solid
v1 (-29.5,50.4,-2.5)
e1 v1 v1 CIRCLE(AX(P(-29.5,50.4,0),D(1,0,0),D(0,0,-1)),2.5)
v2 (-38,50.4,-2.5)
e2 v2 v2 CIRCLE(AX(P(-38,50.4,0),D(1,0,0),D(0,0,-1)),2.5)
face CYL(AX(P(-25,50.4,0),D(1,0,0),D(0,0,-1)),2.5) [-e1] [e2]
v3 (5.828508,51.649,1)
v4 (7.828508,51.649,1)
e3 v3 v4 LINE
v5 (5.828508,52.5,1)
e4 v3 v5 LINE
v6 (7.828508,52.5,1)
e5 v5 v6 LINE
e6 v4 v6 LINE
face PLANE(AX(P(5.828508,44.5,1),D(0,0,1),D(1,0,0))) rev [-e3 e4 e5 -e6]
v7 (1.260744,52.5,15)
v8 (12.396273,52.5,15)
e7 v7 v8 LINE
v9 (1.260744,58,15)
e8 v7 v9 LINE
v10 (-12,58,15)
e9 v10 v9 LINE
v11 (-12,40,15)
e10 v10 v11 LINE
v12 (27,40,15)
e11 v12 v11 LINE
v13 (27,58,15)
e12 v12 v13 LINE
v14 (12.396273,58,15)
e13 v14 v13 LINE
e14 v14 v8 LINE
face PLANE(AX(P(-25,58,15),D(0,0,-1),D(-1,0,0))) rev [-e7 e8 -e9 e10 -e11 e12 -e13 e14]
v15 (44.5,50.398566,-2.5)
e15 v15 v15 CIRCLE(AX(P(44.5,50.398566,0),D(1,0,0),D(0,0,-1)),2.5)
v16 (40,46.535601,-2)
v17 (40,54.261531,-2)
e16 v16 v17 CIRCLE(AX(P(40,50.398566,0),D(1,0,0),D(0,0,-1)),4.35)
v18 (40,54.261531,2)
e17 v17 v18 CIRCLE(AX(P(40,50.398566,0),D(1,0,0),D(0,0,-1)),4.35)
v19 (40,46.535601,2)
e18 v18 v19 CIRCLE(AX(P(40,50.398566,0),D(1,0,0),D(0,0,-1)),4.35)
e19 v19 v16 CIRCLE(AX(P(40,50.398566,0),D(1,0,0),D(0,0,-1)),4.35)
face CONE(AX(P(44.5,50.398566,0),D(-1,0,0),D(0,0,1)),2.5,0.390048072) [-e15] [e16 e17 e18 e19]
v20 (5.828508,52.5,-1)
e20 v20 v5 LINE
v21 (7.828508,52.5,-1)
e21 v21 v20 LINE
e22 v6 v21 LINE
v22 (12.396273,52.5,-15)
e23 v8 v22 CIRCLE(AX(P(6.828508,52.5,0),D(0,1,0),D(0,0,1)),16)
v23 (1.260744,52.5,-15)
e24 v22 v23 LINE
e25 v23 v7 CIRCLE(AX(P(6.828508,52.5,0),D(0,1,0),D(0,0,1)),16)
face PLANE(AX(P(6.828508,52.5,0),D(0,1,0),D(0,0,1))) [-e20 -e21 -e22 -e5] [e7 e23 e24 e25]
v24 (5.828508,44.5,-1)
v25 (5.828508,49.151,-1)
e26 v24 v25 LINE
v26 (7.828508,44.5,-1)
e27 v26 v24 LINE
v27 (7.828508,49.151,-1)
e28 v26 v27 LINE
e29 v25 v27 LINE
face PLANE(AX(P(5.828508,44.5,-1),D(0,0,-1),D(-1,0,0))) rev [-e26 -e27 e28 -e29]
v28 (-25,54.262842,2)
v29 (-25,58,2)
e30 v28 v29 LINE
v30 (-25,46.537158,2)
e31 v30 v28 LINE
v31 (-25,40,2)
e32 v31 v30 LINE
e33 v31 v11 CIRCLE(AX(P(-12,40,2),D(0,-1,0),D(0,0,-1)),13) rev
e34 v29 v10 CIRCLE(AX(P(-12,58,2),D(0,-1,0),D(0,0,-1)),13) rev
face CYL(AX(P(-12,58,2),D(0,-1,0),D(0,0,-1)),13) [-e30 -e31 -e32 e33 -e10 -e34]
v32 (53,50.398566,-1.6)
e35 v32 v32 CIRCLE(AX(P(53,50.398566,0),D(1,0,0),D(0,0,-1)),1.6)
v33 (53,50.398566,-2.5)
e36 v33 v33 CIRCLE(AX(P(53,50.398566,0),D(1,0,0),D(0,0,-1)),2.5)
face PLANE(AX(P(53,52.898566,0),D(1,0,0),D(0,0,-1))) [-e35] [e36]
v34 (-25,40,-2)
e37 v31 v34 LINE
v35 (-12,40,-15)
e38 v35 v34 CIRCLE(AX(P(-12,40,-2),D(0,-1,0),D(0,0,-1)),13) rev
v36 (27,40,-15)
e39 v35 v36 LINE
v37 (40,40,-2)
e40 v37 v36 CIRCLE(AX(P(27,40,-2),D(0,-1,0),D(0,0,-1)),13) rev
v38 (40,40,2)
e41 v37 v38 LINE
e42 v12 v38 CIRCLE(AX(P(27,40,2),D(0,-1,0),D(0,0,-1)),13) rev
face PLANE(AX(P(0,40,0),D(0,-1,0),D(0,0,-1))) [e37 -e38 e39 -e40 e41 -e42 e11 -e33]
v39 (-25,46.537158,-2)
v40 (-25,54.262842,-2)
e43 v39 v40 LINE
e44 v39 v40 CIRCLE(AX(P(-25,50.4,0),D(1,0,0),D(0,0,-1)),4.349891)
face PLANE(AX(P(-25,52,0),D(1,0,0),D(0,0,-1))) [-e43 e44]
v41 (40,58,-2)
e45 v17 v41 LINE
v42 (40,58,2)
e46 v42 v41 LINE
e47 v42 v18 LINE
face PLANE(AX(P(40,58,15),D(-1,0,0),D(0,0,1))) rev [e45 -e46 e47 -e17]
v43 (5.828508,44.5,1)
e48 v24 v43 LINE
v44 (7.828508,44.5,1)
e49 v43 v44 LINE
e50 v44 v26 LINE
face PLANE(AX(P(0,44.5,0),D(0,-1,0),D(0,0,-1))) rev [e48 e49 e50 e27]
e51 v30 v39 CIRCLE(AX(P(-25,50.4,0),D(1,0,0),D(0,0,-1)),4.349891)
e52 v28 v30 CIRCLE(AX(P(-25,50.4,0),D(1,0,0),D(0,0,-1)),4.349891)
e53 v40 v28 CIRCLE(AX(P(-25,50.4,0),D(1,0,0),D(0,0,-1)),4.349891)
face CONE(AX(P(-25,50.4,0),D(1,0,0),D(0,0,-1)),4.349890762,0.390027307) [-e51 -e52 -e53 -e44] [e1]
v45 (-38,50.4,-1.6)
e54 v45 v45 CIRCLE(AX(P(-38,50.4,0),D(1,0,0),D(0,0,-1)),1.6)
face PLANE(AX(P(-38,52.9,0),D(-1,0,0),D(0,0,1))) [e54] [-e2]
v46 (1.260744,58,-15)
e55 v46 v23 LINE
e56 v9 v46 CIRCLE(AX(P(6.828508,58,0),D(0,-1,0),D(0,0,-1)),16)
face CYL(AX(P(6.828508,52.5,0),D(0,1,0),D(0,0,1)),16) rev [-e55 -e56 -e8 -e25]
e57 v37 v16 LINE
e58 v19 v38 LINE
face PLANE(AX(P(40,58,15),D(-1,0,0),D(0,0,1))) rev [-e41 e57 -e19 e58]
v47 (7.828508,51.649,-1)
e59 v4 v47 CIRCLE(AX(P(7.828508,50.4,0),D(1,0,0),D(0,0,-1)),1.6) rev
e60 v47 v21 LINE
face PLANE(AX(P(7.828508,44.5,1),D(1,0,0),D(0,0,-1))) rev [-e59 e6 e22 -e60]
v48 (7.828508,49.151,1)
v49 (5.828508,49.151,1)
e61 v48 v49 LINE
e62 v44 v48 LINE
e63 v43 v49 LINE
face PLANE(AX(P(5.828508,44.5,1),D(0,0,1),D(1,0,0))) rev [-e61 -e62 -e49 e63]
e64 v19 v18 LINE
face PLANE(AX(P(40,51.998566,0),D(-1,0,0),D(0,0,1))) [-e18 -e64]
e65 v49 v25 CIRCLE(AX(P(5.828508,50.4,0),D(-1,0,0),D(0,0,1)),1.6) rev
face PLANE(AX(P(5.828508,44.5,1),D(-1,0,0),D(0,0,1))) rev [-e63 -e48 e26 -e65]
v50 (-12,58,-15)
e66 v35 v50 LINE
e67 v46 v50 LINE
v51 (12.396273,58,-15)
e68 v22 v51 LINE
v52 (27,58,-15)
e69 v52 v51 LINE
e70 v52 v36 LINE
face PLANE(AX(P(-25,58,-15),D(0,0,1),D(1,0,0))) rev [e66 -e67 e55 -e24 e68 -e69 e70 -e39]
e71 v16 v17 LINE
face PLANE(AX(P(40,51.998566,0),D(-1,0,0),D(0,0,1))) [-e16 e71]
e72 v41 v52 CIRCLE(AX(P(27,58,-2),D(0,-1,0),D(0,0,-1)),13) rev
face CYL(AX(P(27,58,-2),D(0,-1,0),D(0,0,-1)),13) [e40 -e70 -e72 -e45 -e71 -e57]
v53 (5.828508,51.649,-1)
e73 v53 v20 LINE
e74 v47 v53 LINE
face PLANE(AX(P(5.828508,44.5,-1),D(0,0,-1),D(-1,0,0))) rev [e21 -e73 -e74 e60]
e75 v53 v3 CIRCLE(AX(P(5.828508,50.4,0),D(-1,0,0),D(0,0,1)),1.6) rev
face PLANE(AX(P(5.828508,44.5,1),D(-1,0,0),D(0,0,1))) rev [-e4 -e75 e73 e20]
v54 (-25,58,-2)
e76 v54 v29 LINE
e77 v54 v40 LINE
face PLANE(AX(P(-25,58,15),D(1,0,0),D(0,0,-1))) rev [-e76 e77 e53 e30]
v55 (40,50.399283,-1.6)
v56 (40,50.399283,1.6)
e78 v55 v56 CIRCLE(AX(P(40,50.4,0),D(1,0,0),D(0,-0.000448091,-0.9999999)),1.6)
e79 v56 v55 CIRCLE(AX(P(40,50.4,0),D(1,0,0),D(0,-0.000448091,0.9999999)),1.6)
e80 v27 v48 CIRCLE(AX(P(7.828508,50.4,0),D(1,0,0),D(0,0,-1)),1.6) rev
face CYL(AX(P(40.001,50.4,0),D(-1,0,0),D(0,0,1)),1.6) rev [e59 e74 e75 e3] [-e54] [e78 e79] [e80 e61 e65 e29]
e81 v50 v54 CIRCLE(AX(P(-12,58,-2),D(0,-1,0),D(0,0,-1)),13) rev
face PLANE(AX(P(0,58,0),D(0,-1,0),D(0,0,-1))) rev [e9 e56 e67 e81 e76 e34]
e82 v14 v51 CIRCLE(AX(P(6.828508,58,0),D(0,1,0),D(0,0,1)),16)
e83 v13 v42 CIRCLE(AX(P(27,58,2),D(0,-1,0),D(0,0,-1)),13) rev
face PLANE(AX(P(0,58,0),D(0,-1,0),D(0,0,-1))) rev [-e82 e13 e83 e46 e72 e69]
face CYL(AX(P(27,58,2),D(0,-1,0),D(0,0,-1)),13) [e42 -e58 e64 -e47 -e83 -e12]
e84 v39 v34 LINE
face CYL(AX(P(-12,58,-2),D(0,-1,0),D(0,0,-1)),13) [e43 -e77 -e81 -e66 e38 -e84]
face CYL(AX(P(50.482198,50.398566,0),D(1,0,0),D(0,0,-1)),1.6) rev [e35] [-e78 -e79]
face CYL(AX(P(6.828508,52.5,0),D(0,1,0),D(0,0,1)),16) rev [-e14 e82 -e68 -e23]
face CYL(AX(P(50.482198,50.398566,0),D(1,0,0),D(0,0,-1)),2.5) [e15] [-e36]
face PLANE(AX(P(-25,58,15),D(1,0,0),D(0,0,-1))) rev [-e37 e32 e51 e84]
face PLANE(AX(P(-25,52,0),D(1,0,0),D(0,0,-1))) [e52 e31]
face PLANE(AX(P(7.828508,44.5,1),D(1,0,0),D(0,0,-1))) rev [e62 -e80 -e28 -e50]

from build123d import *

# Parameters (mm, degrees)
SKETCH1_W           = 65
SKETCH1_H           = 30
BOSS_EXTRUDE1_DEPTH = 58
FILLET1_R           = 13
SKETCH15_W          = 83.696095513
SKETCH15_H          = 31.69844841
CUT_EXTRUDE7_DEPTH  = 50
SKETCH18_R          = 16
CUT_EXTRUDE10_DEPTH = 5.5
CUT_EXTRUDE12_REACH = 90.397
SKETCH3_R           = 1.6
SKETCH21_W          = 2
SKETCH21_H          = 2
CUT_EXTRUDE13_DEPTH = 8


with BuildPart() as part:
    # Sketch1 → Boss-Extrude1 (new body)
    with BuildSketch(Plane(origin=(0, 0, 0), x_dir=(1, 0, 0), z_dir=(0, 1, 0))):
        with Locations((7.5, 0)):
            Rectangle(SKETCH1_W, SKETCH1_H)
    extrude(amount=BOSS_EXTRUDE1_DEPTH)

    # Fillet1
    fillet1_edges = [part.edges().sort_by_distance(p)[0] for p in [
        (40, 29, -15),
        (-25, 29, -15),
        (40, 29, 15),
        (-25, 29, 15),
    ]]
    fillet(fillet1_edges, radius=FILLET1_R)

    # Sketch15 → Cut-Extrude7 (cut)
    with BuildSketch(Plane(origin=(0, -10, 0), x_dir=(-1, 0, 0), z_dir=(0, -1, 0))):
        with Locations((-0.057440767, 0.030479277)):
            Rectangle(SKETCH15_W, SKETCH15_H)
    extrude(amount=-CUT_EXTRUDE7_DEPTH, mode=Mode.SUBTRACT)

    # Sketch18 → Cut-Extrude10 (cut)
    with BuildSketch(Plane(origin=(0, 58, 0), x_dir=(1, 0, 0), z_dir=(0, 1, 0))):
        with Locations((6.828508286, 0)):
            Circle(SKETCH18_R)
    extrude(amount=-CUT_EXTRUDE10_DEPTH, mode=Mode.SUBTRACT)

    # Sketch3 → Cut-Extrude12 (cut, up to next)
    with BuildSketch(Plane.ZY.offset(25), mode=Mode.PRIVATE) as cut_extrude12_sk1:
        with Locations((0, 50.4)):
            Circle(SKETCH3_R)
    cut_extrude12_tool1 = extrude(cut_extrude12_sk1.sketch, amount=-CUT_EXTRUDE12_REACH, mode=Mode.PRIVATE) & part.part
    add(cut_extrude12_tool1.solids().sort_by_distance((-25, 50.4, 0))[0], mode=Mode.SUBTRACT)

    # Sketch21 → Cut-Extrude13 (cut)
    with BuildSketch(Plane(origin=(0, 52.5, 0), x_dir=(1, 0, 0), z_dir=(0, 1, 0))):
        with Locations((6.828508286, 0)):
            Rectangle(SKETCH21_W, SKETCH21_H)
    extrude(amount=-CUT_EXTRUDE13_DEPTH, mode=Mode.SUBTRACT)

    # Sketch24 → Revolve1 (revolve)
    with BuildSketch(Plane.XY):
        Polygon((-25, 52), (-38, 52), (-38, 52.9), (-29.5, 52.9), (-25, 54.749890762), align=None)
    revolve(axis=Axis((-25, 50.4, 0), (-1, 0, 0)))

    # Sketch25 → Revolve2 (revolve)
    with BuildSketch(Plane.XY):
        Polygon((40, 51.99856611), (40, 54.74856611), (44.5, 52.89856611), (53, 52.89856611), (53, 51.99856611), align=None)
    revolve(axis=Axis((50.482197819, 50.39856611, 0), (-1, 0, 0)))


solid = part.part
